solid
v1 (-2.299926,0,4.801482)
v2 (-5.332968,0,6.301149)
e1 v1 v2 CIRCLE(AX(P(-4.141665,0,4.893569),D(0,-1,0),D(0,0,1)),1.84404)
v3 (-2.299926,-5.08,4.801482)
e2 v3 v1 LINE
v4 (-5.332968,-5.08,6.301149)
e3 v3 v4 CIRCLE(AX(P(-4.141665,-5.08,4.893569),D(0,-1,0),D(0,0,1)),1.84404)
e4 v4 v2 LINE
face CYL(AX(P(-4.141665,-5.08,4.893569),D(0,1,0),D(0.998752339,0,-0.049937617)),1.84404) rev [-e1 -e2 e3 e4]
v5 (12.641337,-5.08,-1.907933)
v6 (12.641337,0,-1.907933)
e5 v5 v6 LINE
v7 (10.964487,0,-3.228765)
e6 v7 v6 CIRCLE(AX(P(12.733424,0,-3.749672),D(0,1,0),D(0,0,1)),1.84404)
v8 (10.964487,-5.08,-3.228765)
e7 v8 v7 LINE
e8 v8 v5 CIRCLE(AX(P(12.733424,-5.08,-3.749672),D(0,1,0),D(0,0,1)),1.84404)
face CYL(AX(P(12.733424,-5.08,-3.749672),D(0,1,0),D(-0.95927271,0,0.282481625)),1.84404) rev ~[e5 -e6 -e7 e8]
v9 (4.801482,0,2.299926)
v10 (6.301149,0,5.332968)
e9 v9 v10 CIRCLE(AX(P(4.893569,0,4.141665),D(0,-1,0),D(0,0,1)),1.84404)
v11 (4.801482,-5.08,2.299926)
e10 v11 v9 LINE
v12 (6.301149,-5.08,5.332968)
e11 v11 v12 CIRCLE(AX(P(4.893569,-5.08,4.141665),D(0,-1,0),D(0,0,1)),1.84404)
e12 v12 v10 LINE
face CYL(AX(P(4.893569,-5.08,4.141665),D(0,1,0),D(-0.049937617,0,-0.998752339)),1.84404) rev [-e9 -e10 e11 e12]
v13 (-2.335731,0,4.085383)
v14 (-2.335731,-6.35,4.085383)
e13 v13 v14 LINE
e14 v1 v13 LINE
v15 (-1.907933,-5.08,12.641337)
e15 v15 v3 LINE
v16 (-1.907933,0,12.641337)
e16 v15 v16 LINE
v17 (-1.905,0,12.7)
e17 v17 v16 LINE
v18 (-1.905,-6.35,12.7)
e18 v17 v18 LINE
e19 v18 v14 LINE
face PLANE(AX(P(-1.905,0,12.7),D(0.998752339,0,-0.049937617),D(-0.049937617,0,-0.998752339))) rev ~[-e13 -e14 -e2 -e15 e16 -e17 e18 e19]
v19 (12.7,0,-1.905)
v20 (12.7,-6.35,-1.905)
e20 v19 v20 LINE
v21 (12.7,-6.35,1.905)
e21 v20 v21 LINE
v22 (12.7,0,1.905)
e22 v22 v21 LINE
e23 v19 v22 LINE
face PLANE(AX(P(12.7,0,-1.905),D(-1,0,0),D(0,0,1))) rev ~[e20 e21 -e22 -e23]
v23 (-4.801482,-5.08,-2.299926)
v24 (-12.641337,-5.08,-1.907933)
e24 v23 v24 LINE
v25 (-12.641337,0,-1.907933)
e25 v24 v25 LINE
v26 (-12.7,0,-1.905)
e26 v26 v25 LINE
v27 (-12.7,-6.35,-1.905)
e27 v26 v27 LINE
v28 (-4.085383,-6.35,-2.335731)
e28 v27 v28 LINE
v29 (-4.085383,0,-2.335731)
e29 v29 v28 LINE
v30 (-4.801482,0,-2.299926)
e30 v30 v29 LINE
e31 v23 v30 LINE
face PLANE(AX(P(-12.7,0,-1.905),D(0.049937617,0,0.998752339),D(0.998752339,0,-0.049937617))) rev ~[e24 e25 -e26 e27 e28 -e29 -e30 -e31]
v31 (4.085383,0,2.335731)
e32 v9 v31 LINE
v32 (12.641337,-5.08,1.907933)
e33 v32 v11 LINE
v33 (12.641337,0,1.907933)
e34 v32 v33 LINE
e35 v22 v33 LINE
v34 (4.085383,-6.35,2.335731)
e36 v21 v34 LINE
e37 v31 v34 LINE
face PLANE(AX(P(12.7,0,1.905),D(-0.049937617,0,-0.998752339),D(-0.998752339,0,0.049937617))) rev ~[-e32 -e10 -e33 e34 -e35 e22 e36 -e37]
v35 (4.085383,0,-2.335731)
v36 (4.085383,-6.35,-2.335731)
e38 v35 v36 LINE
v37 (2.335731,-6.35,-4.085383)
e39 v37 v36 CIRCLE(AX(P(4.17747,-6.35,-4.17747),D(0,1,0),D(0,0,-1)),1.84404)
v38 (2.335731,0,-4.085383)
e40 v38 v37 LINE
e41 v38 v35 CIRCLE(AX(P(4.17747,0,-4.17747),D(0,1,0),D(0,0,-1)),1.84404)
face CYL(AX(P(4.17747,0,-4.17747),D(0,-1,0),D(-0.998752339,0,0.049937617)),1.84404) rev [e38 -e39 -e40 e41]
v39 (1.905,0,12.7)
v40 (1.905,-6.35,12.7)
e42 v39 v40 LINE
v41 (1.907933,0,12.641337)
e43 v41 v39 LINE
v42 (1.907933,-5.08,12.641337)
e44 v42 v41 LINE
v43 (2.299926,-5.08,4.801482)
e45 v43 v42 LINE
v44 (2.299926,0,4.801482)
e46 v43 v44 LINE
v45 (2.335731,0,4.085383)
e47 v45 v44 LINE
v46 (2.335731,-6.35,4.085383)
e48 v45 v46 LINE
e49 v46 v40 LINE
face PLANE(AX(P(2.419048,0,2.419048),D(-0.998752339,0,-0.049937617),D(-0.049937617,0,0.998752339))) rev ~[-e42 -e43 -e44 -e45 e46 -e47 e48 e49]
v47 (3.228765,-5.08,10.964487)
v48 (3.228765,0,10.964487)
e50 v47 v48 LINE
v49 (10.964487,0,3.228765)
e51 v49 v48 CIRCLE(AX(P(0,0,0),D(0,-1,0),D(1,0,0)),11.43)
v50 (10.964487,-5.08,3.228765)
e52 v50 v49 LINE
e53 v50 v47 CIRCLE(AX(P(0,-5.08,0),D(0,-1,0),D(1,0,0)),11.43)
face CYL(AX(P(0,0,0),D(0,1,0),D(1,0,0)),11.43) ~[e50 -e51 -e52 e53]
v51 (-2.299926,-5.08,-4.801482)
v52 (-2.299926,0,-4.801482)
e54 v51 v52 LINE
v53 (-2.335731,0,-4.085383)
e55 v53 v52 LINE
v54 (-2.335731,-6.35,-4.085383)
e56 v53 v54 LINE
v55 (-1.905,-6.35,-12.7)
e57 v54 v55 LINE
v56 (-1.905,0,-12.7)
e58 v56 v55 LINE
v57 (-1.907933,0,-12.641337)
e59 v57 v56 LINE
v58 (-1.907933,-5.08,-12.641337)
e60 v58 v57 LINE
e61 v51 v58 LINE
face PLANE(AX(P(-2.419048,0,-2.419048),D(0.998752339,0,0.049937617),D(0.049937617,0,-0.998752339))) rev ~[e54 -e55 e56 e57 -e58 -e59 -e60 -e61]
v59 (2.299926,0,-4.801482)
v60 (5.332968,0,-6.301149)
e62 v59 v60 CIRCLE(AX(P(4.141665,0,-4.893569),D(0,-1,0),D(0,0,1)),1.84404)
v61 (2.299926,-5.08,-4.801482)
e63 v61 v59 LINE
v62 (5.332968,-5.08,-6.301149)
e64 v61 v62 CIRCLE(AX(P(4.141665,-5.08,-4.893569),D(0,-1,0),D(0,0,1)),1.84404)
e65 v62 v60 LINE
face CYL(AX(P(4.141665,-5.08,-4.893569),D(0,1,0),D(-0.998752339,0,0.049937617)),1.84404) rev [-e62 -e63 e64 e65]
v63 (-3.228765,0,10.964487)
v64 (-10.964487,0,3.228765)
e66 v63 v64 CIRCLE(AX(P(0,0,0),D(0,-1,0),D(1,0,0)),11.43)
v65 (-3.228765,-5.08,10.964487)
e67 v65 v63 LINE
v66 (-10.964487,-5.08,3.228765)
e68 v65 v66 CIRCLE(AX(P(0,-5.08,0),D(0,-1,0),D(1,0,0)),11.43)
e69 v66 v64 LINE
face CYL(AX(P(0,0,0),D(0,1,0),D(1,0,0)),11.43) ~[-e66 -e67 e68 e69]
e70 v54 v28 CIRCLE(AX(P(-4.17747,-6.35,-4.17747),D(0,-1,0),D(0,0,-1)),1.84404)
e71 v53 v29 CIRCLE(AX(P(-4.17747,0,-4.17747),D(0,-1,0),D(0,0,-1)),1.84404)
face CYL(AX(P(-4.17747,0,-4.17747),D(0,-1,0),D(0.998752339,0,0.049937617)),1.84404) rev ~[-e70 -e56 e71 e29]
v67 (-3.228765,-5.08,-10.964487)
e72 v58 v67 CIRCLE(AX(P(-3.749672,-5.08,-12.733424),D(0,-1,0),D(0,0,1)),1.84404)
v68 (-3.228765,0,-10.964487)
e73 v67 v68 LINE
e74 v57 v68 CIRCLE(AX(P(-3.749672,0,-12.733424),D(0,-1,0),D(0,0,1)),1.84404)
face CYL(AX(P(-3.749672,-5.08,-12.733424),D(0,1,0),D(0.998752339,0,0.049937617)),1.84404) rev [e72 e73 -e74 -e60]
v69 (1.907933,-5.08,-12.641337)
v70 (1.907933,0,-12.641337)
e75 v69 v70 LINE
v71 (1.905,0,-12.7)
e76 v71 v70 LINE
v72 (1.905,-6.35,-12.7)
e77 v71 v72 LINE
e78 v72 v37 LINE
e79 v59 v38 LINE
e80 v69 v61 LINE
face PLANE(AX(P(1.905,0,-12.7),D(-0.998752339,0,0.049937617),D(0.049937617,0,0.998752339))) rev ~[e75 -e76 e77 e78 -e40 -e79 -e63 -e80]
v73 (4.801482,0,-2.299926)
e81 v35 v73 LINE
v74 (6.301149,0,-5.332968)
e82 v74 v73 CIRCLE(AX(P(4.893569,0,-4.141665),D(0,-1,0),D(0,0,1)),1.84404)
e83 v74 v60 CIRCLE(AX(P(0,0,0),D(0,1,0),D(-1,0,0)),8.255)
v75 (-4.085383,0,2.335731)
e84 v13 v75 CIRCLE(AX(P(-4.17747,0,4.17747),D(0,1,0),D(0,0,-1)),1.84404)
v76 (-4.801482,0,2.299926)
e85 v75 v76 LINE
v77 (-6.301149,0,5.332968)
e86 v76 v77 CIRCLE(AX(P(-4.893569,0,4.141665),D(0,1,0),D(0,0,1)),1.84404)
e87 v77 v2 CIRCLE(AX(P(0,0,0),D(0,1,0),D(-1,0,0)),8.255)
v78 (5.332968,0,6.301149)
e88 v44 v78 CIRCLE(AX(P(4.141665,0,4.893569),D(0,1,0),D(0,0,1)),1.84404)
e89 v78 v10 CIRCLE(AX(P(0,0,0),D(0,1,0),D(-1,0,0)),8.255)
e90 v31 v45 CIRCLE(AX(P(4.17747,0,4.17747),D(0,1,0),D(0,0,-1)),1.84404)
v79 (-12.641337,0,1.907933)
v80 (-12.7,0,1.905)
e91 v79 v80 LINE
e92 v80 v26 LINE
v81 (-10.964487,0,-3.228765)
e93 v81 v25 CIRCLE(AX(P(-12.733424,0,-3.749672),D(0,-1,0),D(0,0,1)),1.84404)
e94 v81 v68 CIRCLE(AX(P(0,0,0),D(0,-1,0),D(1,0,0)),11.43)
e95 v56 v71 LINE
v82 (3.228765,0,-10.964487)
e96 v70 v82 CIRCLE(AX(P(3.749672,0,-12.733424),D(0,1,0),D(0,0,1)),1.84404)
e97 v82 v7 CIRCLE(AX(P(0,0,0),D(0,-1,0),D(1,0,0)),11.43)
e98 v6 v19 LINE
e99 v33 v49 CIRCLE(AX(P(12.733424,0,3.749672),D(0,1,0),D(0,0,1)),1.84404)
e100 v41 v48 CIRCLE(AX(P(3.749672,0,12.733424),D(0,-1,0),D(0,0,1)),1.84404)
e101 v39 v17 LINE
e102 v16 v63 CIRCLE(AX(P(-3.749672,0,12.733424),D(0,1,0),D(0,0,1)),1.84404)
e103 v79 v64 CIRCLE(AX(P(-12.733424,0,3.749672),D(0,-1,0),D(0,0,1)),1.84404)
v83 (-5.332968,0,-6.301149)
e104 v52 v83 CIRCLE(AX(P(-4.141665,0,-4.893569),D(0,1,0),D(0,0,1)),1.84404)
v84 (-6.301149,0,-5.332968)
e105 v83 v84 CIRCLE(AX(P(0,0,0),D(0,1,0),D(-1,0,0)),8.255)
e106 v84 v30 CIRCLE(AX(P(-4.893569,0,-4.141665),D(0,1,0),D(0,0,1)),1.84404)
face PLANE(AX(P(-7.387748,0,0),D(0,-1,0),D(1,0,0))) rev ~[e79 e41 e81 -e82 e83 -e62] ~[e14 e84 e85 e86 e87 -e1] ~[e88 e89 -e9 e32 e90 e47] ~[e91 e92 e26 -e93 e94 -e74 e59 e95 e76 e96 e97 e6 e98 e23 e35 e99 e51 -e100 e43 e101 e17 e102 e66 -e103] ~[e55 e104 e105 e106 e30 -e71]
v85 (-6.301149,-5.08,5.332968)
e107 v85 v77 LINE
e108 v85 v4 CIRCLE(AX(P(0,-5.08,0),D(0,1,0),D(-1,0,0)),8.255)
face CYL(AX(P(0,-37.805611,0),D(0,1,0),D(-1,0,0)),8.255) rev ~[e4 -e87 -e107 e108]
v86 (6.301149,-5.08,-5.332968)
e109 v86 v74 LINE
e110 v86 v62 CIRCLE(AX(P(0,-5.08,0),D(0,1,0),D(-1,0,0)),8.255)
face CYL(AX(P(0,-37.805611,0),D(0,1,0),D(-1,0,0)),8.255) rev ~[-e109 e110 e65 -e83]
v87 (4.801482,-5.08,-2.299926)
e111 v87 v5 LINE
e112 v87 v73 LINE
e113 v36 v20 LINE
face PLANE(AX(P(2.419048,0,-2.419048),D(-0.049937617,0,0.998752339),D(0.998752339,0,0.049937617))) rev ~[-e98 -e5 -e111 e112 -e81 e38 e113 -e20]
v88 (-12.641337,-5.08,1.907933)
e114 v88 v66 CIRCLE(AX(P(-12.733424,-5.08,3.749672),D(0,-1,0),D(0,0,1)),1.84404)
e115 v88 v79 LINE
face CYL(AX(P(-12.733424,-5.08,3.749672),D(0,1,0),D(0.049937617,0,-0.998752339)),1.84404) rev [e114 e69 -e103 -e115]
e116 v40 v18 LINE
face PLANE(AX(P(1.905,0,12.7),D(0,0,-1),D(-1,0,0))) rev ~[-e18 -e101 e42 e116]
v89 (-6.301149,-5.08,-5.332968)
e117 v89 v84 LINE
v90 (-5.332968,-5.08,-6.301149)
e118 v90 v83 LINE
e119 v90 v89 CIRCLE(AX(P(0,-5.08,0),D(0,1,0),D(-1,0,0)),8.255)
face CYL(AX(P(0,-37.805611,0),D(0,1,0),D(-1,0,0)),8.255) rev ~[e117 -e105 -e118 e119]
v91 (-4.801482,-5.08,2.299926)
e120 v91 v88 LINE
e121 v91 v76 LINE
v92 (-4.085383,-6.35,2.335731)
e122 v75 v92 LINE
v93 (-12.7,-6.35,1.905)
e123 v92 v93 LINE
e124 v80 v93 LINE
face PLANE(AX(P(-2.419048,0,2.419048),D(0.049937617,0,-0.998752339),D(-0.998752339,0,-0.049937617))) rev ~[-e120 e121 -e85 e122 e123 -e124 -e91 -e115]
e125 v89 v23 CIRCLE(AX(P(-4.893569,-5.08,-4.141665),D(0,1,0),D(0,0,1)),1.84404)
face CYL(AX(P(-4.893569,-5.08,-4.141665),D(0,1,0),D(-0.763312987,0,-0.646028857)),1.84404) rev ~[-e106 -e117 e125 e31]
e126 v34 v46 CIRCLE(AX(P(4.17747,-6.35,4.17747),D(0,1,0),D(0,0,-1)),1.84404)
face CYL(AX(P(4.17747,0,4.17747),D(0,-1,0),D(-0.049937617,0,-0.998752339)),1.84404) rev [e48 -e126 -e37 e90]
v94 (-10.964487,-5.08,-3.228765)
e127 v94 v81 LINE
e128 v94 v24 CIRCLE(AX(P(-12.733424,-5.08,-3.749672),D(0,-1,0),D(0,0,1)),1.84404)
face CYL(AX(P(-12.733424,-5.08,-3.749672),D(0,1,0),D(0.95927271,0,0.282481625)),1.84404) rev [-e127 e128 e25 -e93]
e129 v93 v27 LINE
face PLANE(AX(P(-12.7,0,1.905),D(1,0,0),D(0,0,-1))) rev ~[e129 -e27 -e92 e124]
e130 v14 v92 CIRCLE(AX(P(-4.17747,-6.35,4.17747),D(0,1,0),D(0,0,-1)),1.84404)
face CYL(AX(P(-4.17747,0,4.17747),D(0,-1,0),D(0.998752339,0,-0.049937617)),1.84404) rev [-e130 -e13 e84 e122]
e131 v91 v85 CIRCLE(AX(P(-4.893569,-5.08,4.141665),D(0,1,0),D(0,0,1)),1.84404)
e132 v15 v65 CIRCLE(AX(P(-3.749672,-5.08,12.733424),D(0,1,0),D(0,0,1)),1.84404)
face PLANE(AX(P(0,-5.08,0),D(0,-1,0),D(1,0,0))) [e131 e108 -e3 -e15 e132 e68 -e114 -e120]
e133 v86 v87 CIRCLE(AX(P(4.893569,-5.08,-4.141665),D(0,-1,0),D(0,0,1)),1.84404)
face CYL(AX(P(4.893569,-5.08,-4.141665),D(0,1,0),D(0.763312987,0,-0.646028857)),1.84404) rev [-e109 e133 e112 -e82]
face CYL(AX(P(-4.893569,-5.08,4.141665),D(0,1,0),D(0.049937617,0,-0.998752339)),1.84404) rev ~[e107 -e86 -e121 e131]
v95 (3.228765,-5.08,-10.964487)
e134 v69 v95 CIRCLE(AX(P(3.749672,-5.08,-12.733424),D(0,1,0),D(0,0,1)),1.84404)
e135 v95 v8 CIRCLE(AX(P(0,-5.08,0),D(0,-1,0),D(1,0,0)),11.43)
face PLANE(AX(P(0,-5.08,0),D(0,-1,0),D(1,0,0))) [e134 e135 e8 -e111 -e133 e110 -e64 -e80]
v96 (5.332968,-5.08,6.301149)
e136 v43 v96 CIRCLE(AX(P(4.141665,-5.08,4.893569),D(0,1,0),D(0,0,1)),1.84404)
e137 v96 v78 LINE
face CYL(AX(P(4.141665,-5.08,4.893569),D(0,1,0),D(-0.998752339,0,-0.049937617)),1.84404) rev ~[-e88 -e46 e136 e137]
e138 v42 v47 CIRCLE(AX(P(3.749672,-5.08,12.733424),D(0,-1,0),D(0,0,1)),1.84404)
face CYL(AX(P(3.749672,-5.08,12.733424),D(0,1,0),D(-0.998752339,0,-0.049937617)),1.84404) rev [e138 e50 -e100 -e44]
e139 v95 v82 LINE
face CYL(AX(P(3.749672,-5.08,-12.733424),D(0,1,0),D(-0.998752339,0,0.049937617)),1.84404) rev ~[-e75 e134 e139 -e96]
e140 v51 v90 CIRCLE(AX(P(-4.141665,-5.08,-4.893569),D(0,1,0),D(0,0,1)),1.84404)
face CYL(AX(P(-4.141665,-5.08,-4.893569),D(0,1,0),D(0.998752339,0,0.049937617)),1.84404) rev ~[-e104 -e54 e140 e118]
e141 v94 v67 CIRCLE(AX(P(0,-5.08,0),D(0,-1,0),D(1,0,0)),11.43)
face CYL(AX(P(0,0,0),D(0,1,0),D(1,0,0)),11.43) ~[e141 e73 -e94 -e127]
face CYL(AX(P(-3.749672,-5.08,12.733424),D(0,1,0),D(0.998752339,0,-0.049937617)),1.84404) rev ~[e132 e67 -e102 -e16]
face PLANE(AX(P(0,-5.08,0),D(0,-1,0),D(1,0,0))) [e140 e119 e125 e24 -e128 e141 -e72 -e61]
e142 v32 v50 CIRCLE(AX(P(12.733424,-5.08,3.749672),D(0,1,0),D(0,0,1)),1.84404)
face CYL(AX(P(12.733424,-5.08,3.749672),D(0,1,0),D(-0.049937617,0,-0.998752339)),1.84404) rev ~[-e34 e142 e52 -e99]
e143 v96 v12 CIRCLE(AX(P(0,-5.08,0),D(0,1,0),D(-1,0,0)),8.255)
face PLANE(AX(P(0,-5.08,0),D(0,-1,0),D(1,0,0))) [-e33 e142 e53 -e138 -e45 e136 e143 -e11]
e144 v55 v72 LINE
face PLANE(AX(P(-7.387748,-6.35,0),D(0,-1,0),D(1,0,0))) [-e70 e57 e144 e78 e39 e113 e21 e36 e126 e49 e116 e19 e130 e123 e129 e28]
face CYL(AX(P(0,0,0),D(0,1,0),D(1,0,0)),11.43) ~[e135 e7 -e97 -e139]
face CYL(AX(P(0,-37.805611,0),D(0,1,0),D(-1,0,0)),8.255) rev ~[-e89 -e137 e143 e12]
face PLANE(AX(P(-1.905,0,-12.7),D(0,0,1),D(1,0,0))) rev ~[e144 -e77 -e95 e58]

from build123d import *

# Parameters (mm, degrees)
F0_R     = 11.43
F1_DEPTH = 5.08
F3_D     = 16.51
F5_DEPTH = 6.35
F6_R     = 1.84404


# Not quite as in the source:
# - a feature names something its author has since deleted; it is built from what else it names


with BuildPart() as f1:
    # F0 (on Front) → F1 (new body)
    with BuildSketch(Plane.XZ):
        Circle(F0_R)
    extrude(amount=F1_DEPTH)

    # F3 (through all)
    with Locations(Plane.XZ.offset(5.08)):
        with Locations((0, 0)):
            Hole(F3_D / 2)

    # F4 (on Front) → F5 (join)
    with BuildSketch(Plane.XZ):
        Polygon((-2.419047619, -2.419047619), (-2.54, 0), (-2.419047619, 2.419047619), (-12.7, 1.905), (-12.7, -1.905), align=None)
        Polygon((0, -2.54), (-2.419047619, -2.419047619), (-1.905, -12.7), (1.905, -12.7), (2.419047619, -2.419047619), align=None)
        Polygon((2.419047619, 2.419047619), (2.54, 0), (2.419047619, -2.419047619), (12.7, -1.905), (12.7, 1.905), align=None)
        Polygon((-1.905, 12.7), (-2.419047619, 2.419047619), (0, 2.54), (2.419047619, 2.419047619), (1.905, 12.7), align=None)
        Polygon((0, 0), (-2.54, 0), (-2.419047619, -2.419047619), (0, -2.54), align=None)
        Polygon((0, 2.54), (0, 0), (2.54, 0), (2.419047619, 2.419047619), align=None)
        Polygon((-2.419047619, 2.419047619), (-2.54, 0), (0, 0), (0, 2.54), align=None)
        Polygon((2.54, 0), (0, 0), (0, -2.54), (2.419047619, -2.419047619), align=None)
    extrude(amount=F5_DEPTH)

    # F6
    f6_edges = [f1.edges().sort_by_distance(p)[0] for p in [
        (-2.419048, -3.175, -2.419048),
        (-2.419048, -3.175, 2.419048),
        (2.419048, -3.175, 2.419048),
        (2.419048, -3.175, -2.419048),
        (-11.257705, -2.54, -1.977115),
        (-1.977115, -2.54, -11.257705),
        (1.977115, -2.54, -11.257705),
        (11.257705, -2.54, -1.977115),
        (11.257705, -2.54, 1.977115),
        (1.977115, -2.54, 11.257705),
        (-1.977115, -2.54, 11.257705),
        (-11.257705, -2.54, 1.977115),
        (7.972423, -2.54, 2.141379),
        (7.972423, -2.54, -2.141379),
        (2.141379, -2.54, -7.972423),
        (-2.141379, -2.54, -7.972423),
        (-7.972423, -2.54, -2.141379),
        (-7.972423, -2.54, 2.141379),
        (-2.141379, -2.54, 7.972423),
        (2.141379, -2.54, 7.972423),
    ]]
    fillet(f6_edges, radius=F6_R)


solid = f1.part
